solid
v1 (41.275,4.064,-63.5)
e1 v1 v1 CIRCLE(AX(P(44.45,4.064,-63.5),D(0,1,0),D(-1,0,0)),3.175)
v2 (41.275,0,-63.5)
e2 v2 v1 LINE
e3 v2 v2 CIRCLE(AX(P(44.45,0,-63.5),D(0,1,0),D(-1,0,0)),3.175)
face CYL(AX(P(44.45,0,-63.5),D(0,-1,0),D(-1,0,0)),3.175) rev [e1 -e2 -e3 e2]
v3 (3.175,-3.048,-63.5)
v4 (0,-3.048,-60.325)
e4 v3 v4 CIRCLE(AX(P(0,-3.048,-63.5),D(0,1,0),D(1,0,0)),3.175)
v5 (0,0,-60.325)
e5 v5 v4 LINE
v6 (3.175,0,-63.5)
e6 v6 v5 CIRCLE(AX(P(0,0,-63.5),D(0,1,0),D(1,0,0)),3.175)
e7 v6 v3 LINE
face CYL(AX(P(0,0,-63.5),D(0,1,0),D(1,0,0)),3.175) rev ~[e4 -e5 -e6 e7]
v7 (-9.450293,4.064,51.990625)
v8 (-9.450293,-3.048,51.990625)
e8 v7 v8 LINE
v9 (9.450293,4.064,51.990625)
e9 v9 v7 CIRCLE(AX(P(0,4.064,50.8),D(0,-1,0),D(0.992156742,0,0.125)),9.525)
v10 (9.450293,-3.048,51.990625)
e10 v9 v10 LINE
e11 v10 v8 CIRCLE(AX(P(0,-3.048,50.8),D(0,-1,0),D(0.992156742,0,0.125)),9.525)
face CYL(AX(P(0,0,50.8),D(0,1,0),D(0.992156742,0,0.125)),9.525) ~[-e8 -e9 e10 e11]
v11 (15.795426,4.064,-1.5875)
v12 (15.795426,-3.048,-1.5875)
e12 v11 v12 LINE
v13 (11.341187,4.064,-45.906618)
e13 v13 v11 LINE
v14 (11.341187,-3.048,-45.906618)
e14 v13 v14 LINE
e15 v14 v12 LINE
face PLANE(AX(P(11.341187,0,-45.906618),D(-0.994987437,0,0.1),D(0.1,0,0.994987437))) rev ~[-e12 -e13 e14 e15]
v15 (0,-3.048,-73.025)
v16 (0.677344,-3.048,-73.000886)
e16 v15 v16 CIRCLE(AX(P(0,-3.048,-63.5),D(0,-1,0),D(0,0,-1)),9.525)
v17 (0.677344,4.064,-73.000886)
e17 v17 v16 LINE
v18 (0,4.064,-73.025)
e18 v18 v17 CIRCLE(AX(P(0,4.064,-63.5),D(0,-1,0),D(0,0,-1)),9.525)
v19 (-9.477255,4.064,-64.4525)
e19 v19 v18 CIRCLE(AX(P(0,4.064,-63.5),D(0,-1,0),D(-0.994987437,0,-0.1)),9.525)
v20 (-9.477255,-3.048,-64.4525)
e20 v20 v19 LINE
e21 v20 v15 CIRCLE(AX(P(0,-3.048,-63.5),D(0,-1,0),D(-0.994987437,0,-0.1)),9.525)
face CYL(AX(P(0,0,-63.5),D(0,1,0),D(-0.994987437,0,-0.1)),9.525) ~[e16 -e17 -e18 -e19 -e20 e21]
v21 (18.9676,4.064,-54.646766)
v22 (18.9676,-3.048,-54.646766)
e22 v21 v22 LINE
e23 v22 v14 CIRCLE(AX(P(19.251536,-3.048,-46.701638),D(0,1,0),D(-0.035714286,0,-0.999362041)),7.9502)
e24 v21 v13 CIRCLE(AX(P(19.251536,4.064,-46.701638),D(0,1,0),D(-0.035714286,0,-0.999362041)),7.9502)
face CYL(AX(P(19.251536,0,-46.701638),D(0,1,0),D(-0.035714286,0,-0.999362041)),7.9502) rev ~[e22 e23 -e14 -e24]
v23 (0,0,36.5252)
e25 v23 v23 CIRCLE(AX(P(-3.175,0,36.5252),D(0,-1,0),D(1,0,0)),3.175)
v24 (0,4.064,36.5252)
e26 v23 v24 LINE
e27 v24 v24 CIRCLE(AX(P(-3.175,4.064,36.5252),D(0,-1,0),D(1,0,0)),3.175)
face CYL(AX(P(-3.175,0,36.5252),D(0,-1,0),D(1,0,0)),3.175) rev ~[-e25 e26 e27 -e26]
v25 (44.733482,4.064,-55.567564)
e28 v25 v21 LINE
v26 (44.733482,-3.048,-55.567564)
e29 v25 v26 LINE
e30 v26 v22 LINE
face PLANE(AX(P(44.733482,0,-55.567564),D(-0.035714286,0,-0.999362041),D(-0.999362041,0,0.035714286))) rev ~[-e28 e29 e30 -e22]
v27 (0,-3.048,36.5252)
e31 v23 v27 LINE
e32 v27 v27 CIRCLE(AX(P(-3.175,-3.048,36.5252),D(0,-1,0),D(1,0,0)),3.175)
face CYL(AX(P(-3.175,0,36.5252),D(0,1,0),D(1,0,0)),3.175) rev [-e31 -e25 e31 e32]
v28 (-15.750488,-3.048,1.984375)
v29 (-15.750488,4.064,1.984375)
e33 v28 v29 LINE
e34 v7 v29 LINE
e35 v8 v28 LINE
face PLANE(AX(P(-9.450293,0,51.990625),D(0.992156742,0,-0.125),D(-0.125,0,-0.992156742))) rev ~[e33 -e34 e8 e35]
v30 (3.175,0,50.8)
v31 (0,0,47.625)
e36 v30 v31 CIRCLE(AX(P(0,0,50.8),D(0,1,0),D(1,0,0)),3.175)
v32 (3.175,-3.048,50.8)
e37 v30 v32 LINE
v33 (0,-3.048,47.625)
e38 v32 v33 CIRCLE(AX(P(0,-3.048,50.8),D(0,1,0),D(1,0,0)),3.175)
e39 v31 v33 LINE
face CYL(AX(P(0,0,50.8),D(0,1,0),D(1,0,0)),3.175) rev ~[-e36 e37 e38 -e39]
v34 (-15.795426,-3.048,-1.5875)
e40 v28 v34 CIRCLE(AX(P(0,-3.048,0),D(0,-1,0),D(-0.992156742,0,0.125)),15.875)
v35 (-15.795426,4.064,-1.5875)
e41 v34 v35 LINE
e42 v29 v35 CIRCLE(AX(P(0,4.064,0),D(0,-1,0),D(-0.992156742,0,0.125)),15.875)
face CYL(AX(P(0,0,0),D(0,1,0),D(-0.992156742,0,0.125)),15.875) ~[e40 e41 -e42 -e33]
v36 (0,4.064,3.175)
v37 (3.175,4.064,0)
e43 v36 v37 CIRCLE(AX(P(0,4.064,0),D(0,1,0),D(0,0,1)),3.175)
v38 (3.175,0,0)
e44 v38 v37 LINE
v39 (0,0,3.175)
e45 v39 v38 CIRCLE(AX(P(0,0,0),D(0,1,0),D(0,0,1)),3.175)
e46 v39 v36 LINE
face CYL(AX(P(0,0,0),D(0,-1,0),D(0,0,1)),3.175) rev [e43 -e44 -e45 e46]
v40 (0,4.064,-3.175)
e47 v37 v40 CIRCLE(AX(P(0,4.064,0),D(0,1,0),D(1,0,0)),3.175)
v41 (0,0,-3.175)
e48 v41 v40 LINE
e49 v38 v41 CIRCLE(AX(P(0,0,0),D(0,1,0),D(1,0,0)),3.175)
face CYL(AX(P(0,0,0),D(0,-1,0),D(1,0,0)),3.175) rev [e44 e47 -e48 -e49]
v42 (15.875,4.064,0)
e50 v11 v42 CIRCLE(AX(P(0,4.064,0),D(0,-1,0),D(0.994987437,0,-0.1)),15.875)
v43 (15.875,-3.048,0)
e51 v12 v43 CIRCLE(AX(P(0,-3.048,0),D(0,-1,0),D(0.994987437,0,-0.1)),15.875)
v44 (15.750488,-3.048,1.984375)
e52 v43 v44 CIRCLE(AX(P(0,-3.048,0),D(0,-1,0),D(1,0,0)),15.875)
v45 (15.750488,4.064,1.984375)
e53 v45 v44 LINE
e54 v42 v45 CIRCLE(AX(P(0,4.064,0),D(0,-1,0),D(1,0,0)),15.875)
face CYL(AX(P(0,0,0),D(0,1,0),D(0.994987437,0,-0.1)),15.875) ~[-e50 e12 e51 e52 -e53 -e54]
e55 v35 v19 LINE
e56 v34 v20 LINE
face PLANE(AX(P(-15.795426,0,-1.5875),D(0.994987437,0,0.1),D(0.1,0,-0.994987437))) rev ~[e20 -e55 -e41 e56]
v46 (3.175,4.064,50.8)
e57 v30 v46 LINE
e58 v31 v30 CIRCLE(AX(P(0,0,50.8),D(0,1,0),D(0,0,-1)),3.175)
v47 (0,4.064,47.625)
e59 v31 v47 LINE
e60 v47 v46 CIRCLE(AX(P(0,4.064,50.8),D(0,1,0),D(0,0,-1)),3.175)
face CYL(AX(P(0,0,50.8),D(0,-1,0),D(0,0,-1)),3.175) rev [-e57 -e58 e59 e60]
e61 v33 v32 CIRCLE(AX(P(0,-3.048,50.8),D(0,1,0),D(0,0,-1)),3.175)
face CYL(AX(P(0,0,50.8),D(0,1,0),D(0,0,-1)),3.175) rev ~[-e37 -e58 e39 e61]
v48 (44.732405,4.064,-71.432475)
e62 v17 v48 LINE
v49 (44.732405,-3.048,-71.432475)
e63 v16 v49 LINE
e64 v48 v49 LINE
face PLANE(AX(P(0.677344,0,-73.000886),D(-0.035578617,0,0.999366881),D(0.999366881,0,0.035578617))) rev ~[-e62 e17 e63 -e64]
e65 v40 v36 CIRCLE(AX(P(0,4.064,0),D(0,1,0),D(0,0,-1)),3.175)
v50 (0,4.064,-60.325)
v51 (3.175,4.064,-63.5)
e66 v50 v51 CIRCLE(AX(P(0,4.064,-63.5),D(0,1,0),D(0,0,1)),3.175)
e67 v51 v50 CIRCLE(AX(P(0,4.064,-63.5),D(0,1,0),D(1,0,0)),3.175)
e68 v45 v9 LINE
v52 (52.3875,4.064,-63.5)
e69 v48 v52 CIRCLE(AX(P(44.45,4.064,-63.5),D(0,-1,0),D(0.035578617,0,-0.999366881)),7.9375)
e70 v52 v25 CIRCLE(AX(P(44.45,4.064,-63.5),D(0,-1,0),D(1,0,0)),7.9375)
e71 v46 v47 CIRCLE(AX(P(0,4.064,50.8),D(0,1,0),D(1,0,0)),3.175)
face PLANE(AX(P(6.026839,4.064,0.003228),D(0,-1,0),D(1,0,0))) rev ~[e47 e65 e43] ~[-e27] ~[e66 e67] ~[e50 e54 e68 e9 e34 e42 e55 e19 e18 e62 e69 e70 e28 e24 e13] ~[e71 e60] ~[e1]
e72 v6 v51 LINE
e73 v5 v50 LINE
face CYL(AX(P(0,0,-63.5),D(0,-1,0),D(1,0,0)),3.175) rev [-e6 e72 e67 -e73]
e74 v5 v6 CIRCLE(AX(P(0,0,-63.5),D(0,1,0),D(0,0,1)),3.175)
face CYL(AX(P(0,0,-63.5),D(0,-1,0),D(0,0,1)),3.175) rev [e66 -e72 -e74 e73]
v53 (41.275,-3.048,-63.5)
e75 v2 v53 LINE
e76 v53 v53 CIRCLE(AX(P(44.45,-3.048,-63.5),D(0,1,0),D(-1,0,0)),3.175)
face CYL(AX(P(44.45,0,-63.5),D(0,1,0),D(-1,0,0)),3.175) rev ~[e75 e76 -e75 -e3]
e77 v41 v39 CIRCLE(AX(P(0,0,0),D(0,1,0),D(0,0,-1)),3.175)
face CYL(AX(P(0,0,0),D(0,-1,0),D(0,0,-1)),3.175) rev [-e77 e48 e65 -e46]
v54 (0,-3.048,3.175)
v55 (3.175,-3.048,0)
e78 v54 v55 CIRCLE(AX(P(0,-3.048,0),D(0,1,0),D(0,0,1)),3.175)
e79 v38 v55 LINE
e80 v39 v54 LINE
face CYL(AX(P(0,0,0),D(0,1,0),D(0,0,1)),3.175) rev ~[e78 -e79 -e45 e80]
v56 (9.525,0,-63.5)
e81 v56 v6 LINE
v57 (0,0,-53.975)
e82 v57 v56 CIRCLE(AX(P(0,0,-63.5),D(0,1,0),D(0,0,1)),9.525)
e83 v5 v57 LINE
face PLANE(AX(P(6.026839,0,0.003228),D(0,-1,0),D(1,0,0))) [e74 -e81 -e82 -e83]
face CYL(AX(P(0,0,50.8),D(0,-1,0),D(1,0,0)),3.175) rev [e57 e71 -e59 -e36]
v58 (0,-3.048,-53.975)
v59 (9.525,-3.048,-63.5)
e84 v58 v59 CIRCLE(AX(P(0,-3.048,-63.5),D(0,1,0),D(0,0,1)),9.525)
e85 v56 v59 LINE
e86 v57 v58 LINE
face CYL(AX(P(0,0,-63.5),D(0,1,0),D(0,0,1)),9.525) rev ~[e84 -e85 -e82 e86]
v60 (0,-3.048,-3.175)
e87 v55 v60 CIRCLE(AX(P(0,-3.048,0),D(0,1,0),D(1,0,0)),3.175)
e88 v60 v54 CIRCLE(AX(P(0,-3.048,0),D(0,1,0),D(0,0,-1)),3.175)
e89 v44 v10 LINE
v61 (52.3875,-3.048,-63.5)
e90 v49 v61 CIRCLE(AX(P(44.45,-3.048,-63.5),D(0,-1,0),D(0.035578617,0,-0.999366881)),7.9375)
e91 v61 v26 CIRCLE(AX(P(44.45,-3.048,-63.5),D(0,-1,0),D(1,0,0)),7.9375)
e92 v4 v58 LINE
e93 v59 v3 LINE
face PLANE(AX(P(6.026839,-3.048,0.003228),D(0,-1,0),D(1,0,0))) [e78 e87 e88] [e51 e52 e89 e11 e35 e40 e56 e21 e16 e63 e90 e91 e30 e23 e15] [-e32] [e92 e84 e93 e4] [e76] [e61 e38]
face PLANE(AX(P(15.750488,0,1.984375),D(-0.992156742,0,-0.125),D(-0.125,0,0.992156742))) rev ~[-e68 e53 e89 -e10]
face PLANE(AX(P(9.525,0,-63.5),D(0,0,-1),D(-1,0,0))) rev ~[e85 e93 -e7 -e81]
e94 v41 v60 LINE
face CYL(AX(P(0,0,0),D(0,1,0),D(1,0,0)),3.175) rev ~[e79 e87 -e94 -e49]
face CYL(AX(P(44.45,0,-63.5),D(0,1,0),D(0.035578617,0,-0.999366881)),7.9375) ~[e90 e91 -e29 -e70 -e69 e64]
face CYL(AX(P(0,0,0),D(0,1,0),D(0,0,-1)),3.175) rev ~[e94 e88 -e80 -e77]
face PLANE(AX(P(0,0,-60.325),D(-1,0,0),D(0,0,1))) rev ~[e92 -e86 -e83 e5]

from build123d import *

# Parameters (mm, degrees)
F0_R     = 3.175
F1_DEPTH = 4.064
F2_DEPTH = 3.048


with BuildPart() as f1:
    # F0 (on Front) → F1 (new body)
    with BuildSketch(Plane.XZ):
        with BuildLine():
            ThreePointArc((15.7954255641, -1.5875), (15.8550939106, -0.7947465541), (15.875, 0))
            ThreePointArc((15.875, 0), (15.8438414904, 0.9941387366), (15.7504882737, 1.984375))
            ThreePointArc((15.7504882737, 1.984375), (10.5003255158, 11.90625), (0, 15.875))
            Line((0, 15.875), (0, 3.175))
            ThreePointArc((0, 3.175), (2.2450640303, 2.2450640303), (3.175, 0))
            ThreePointArc((3.175, 0), (2.2450640303, -2.2450640303), (0, -3.175))
            Line((0, -3.175), (0, -15.875))
            ThreePointArc((0, -15.875), (10.6492737428, -11.7732150983), (15.7954255641, -1.5875))
        make_face()
        with BuildLine():
            ThreePointArc((0, 15.875), (10.5003255158, 11.90625), (15.7504882737, 1.984375))
            Line((15.7504882737, 1.984375), (9.4502929642, 51.990625))
            ThreePointArc((9.4502929642, 51.990625), (9.5063048942, 51.396483242), (9.525, 50.8))
            ThreePointArc((9.525, 50.8), (6.7351920908, 44.0648079092), (0, 41.275))
            Line((0, 41.275), (0, 36.5252))
            Line((0, 36.5252), (0, 29.7381002456))
            Line((0, 29.7381002456), (0, 15.875))
        make_face()
        with BuildLine():
            Line((11.3411865923, -45.9066181876), (15.7954255641, -1.5875))
            ThreePointArc((15.7954255641, -1.5875), (10.6492737428, -11.7732150983), (0, -15.875))
            Line((0, -15.875), (0, -53.975))
            ThreePointArc((0, -53.975), (6.7351920908, -56.7648079092), (9.525, -63.5))
            Line((9.525, -63.5), (36.5125, -63.5))
            ThreePointArc((36.5125, -63.5), (38.9384772185, -57.7879930953), (44.7334821429, -55.5675637964))
            Line((44.7334821429, -55.5675637964), (18.9676000005, -54.6467662892))
            ThreePointArc((18.9676000005, -54.6467662892), (13.2611998974, -51.9286408502), (11.3411865923, -45.9066181876))
        make_face()
        with BuildLine():
            Line((0, 3.175), (0, 15.875))
            ThreePointArc((0, 15.875), (-10.5003255158, 11.90625), (-15.7504882737, 1.984375))
            ThreePointArc((-15.7504882737, 1.984375), (-15.8737438155, 0.1997054867), (-15.7954255641, -1.5875))
            ThreePointArc((-15.7954255641, -1.5875), (-10.6492737428, -11.7732150983), (0, -15.875))
            Line((0, -15.875), (0, -3.175))
            ThreePointArc((0, -3.175), (-3.175, 0), (0, 3.175))
        make_face()
        with BuildLine():
            ThreePointArc((-15.7504882737, 1.984375), (-10.5003255158, 11.90625), (0, 15.875))
            Line((0, 15.875), (0, 29.7381002456))
            Line((0, 29.7381002456), (0, 36.5252))
            Line((0, 36.5252), (0, 41.275))
            ThreePointArc((0, 41.275), (-7.14375, 44.4998046905), (-9.4502929642, 51.990625))
            Line((-9.4502929642, 51.990625), (-15.7504882737, 1.984375))
        make_face()
        with Locations((-3.175, 36.5252)):
            Circle(F0_R, mode=Mode.SUBTRACT)
        with BuildLine():
            ThreePointArc((9.525, 50.8), (9.5063048942, 51.396483242), (9.4502929642, 51.990625))
            ThreePointArc((9.4502929642, 51.990625), (0, 60.325), (-9.4502929642, 51.990625))
            ThreePointArc((-9.4502929642, 51.990625), (-7.14375, 44.4998046905), (0, 41.275))
            ThreePointArc((0, 41.275), (6.7351920908, 44.0648079092), (9.525, 50.8))
        make_face()
        with BuildLine():
            ThreePointArc((3.175, 50.8), (2.2450640303, 48.5549359697), (0, 47.625))
            ThreePointArc((0, 47.625), (-2.2450640303, 53.0450640303), (3.175, 50.8))
        make_face(mode=Mode.SUBTRACT)
        with BuildLine():
            Line((0, -53.975), (0, -15.875))
            ThreePointArc((0, -15.875), (-10.6492737428, -11.7732150983), (-15.7954255641, -1.5875))
            Line((-15.7954255641, -1.5875), (-9.4772553384, -64.4525))
            ThreePointArc((-9.4772553384, -64.4525), (-7.063929059, -57.1104357543), (0, -53.975))
        make_face()
        with BuildLine():
            Line((0, -60.325), (0, -53.975))
            ThreePointArc((0, -53.975), (-7.063929059, -57.1104357543), (-9.4772553384, -64.4525))
            ThreePointArc((-9.4772553384, -64.4525), (-6.3895642457, -70.563929059), (0, -73.025))
            Line((0, -73.025), (0.6773435479, -73.000885786))
            ThreePointArc((0.6773435479, -73.000885786), (6.9705567315, -69.9912990883), (9.525, -63.5))
            Line((9.525, -63.5), (3.175, -63.5))
            ThreePointArc((3.175, -63.5), (-2.2450640303, -65.7450640303), (0, -60.325))
        make_face()
        with BuildLine():
            Line((36.5125, -63.5), (9.525, -63.5))
            ThreePointArc((9.525, -63.5), (6.9705567315, -69.9912990883), (0.6773435479, -73.000885786))
            Line((0.6773435479, -73.000885786), (44.7324052746, -71.4324746146))
            ThreePointArc((44.7324052746, -71.4324746146), (38.9380895153, -69.2116327839), (36.5125, -63.5))
        make_face()
        with BuildLine():
            ThreePointArc((52.3875, -63.5), (50.1620069047, -57.9884772185), (44.7334821429, -55.5675637964))
            ThreePointArc((44.7334821429, -55.5675637964), (38.9384772185, -57.7879930953), (36.5125, -63.5))
            ThreePointArc((36.5125, -63.5), (38.9380895153, -69.2116327839), (44.7324052746, -71.4324746146))
            ThreePointArc((44.7324052746, -71.4324746146), (50.1616327839, -69.0119104847), (52.3875, -63.5))
        make_face()
        with BuildLine():
            ThreePointArc((47.625, -63.5), (44.45, -66.675), (41.275, -63.5))
            ThreePointArc((41.275, -63.5), (44.45, -60.325), (47.625, -63.5))
        make_face(mode=Mode.SUBTRACT)
        with BuildLine():
            Line((0.6773435479, -73.000885786), (0, -73.025))
            ThreePointArc((0, -73.025), (0.3388863295, -73.0189695375), (0.6773435479, -73.000885786))
        make_face()
        with BuildLine():
            ThreePointArc((9.525, -63.5), (6.7351920908, -56.7648079092), (0, -53.975))
            Line((0, -53.975), (0, -60.325))
            ThreePointArc((0, -60.325), (2.2450640303, -61.2549359697), (3.175, -63.5))
            Line((3.175, -63.5), (9.525, -63.5))
        make_face()
    extrude(amount=-F1_DEPTH)

    # F0 (on Front) → F2 (join)
    with BuildSketch(Plane.XZ):
        with BuildLine():
            ThreePointArc((15.7954255641, -1.5875), (15.8550939106, -0.7947465541), (15.875, 0))
            ThreePointArc((15.875, 0), (15.8438414904, 0.9941387366), (15.7504882737, 1.984375))
            ThreePointArc((15.7504882737, 1.984375), (10.5003255158, 11.90625), (0, 15.875))
            Line((0, 15.875), (0, 3.175))
            ThreePointArc((0, 3.175), (2.2450640303, 2.2450640303), (3.175, 0))
            ThreePointArc((3.175, 0), (2.2450640303, -2.2450640303), (0, -3.175))
            Line((0, -3.175), (0, -15.875))
            ThreePointArc((0, -15.875), (10.6492737428, -11.7732150983), (15.7954255641, -1.5875))
        make_face()
        with BuildLine():
            ThreePointArc((0, 15.875), (10.5003255158, 11.90625), (15.7504882737, 1.984375))
            Line((15.7504882737, 1.984375), (9.4502929642, 51.990625))
            ThreePointArc((9.4502929642, 51.990625), (9.5063048942, 51.396483242), (9.525, 50.8))
            ThreePointArc((9.525, 50.8), (6.7351920908, 44.0648079092), (0, 41.275))
            Line((0, 41.275), (0, 36.5252))
            Line((0, 36.5252), (0, 29.7381002456))
            Line((0, 29.7381002456), (0, 15.875))
        make_face()
        with BuildLine():
            Line((11.3411865923, -45.9066181876), (15.7954255641, -1.5875))
            ThreePointArc((15.7954255641, -1.5875), (10.6492737428, -11.7732150983), (0, -15.875))
            Line((0, -15.875), (0, -53.975))
            ThreePointArc((0, -53.975), (6.7351920908, -56.7648079092), (9.525, -63.5))
            Line((9.525, -63.5), (36.5125, -63.5))
            ThreePointArc((36.5125, -63.5), (38.9384772185, -57.7879930953), (44.7334821429, -55.5675637964))
            Line((44.7334821429, -55.5675637964), (18.9676000005, -54.6467662892))
            ThreePointArc((18.9676000005, -54.6467662892), (13.2611998974, -51.9286408502), (11.3411865923, -45.9066181876))
        make_face()
        with BuildLine():
            Line((0, 3.175), (0, 15.875))
            ThreePointArc((0, 15.875), (-10.5003255158, 11.90625), (-15.7504882737, 1.984375))
            ThreePointArc((-15.7504882737, 1.984375), (-15.8737438155, 0.1997054867), (-15.7954255641, -1.5875))
            ThreePointArc((-15.7954255641, -1.5875), (-10.6492737428, -11.7732150983), (0, -15.875))
            Line((0, -15.875), (0, -3.175))
            ThreePointArc((0, -3.175), (-3.175, 0), (0, 3.175))
        make_face()
        with BuildLine():
            ThreePointArc((-15.7504882737, 1.984375), (-10.5003255158, 11.90625), (0, 15.875))
            Line((0, 15.875), (0, 29.7381002456))
            Line((0, 29.7381002456), (0, 36.5252))
            Line((0, 36.5252), (0, 41.275))
            ThreePointArc((0, 41.275), (-7.14375, 44.4998046905), (-9.4502929642, 51.990625))
            Line((-9.4502929642, 51.990625), (-15.7504882737, 1.984375))
        make_face()
        with Locations((-3.175, 36.5252)):
            Circle(F0_R, mode=Mode.SUBTRACT)
        with BuildLine():
            ThreePointArc((9.525, 50.8), (9.5063048942, 51.396483242), (9.4502929642, 51.990625))
            ThreePointArc((9.4502929642, 51.990625), (0, 60.325), (-9.4502929642, 51.990625))
            ThreePointArc((-9.4502929642, 51.990625), (-7.14375, 44.4998046905), (0, 41.275))
            ThreePointArc((0, 41.275), (6.7351920908, 44.0648079092), (9.525, 50.8))
        make_face()
        with BuildLine():
            ThreePointArc((3.175, 50.8), (2.2450640303, 48.5549359697), (0, 47.625))
            ThreePointArc((0, 47.625), (-2.2450640303, 53.0450640303), (3.175, 50.8))
        make_face(mode=Mode.SUBTRACT)
        with BuildLine():
            Line((0, -53.975), (0, -15.875))
            ThreePointArc((0, -15.875), (-10.6492737428, -11.7732150983), (-15.7954255641, -1.5875))
            Line((-15.7954255641, -1.5875), (-9.4772553384, -64.4525))
            ThreePointArc((-9.4772553384, -64.4525), (-7.063929059, -57.1104357543), (0, -53.975))
        make_face()
        with BuildLine():
            Line((0, -60.325), (0, -53.975))
            ThreePointArc((0, -53.975), (-7.063929059, -57.1104357543), (-9.4772553384, -64.4525))
            ThreePointArc((-9.4772553384, -64.4525), (-6.3895642457, -70.563929059), (0, -73.025))
            Line((0, -73.025), (0.6773435479, -73.000885786))
            ThreePointArc((0.6773435479, -73.000885786), (6.9705567315, -69.9912990883), (9.525, -63.5))
            Line((9.525, -63.5), (3.175, -63.5))
            ThreePointArc((3.175, -63.5), (-2.2450640303, -65.7450640303), (0, -60.325))
        make_face()
        with BuildLine():
            Line((36.5125, -63.5), (9.525, -63.5))
            ThreePointArc((9.525, -63.5), (6.9705567315, -69.9912990883), (0.6773435479, -73.000885786))
            Line((0.6773435479, -73.000885786), (44.7324052746, -71.4324746146))
            ThreePointArc((44.7324052746, -71.4324746146), (38.9380895153, -69.2116327839), (36.5125, -63.5))
        make_face()
        with BuildLine():
            ThreePointArc((52.3875, -63.5), (50.1620069047, -57.9884772185), (44.7334821429, -55.5675637964))
            ThreePointArc((44.7334821429, -55.5675637964), (38.9384772185, -57.7879930953), (36.5125, -63.5))
            ThreePointArc((36.5125, -63.5), (38.9380895153, -69.2116327839), (44.7324052746, -71.4324746146))
            ThreePointArc((44.7324052746, -71.4324746146), (50.1616327839, -69.0119104847), (52.3875, -63.5))
        make_face()
        with BuildLine():
            ThreePointArc((47.625, -63.5), (44.45, -66.675), (41.275, -63.5))
            ThreePointArc((41.275, -63.5), (44.45, -60.325), (47.625, -63.5))
        make_face(mode=Mode.SUBTRACT)
        with BuildLine():
            Line((0.6773435479, -73.000885786), (0, -73.025))
            ThreePointArc((0, -73.025), (0.3388863295, -73.0189695375), (0.6773435479, -73.000885786))
        make_face()
    extrude(amount=F2_DEPTH)


solid = f1.part
